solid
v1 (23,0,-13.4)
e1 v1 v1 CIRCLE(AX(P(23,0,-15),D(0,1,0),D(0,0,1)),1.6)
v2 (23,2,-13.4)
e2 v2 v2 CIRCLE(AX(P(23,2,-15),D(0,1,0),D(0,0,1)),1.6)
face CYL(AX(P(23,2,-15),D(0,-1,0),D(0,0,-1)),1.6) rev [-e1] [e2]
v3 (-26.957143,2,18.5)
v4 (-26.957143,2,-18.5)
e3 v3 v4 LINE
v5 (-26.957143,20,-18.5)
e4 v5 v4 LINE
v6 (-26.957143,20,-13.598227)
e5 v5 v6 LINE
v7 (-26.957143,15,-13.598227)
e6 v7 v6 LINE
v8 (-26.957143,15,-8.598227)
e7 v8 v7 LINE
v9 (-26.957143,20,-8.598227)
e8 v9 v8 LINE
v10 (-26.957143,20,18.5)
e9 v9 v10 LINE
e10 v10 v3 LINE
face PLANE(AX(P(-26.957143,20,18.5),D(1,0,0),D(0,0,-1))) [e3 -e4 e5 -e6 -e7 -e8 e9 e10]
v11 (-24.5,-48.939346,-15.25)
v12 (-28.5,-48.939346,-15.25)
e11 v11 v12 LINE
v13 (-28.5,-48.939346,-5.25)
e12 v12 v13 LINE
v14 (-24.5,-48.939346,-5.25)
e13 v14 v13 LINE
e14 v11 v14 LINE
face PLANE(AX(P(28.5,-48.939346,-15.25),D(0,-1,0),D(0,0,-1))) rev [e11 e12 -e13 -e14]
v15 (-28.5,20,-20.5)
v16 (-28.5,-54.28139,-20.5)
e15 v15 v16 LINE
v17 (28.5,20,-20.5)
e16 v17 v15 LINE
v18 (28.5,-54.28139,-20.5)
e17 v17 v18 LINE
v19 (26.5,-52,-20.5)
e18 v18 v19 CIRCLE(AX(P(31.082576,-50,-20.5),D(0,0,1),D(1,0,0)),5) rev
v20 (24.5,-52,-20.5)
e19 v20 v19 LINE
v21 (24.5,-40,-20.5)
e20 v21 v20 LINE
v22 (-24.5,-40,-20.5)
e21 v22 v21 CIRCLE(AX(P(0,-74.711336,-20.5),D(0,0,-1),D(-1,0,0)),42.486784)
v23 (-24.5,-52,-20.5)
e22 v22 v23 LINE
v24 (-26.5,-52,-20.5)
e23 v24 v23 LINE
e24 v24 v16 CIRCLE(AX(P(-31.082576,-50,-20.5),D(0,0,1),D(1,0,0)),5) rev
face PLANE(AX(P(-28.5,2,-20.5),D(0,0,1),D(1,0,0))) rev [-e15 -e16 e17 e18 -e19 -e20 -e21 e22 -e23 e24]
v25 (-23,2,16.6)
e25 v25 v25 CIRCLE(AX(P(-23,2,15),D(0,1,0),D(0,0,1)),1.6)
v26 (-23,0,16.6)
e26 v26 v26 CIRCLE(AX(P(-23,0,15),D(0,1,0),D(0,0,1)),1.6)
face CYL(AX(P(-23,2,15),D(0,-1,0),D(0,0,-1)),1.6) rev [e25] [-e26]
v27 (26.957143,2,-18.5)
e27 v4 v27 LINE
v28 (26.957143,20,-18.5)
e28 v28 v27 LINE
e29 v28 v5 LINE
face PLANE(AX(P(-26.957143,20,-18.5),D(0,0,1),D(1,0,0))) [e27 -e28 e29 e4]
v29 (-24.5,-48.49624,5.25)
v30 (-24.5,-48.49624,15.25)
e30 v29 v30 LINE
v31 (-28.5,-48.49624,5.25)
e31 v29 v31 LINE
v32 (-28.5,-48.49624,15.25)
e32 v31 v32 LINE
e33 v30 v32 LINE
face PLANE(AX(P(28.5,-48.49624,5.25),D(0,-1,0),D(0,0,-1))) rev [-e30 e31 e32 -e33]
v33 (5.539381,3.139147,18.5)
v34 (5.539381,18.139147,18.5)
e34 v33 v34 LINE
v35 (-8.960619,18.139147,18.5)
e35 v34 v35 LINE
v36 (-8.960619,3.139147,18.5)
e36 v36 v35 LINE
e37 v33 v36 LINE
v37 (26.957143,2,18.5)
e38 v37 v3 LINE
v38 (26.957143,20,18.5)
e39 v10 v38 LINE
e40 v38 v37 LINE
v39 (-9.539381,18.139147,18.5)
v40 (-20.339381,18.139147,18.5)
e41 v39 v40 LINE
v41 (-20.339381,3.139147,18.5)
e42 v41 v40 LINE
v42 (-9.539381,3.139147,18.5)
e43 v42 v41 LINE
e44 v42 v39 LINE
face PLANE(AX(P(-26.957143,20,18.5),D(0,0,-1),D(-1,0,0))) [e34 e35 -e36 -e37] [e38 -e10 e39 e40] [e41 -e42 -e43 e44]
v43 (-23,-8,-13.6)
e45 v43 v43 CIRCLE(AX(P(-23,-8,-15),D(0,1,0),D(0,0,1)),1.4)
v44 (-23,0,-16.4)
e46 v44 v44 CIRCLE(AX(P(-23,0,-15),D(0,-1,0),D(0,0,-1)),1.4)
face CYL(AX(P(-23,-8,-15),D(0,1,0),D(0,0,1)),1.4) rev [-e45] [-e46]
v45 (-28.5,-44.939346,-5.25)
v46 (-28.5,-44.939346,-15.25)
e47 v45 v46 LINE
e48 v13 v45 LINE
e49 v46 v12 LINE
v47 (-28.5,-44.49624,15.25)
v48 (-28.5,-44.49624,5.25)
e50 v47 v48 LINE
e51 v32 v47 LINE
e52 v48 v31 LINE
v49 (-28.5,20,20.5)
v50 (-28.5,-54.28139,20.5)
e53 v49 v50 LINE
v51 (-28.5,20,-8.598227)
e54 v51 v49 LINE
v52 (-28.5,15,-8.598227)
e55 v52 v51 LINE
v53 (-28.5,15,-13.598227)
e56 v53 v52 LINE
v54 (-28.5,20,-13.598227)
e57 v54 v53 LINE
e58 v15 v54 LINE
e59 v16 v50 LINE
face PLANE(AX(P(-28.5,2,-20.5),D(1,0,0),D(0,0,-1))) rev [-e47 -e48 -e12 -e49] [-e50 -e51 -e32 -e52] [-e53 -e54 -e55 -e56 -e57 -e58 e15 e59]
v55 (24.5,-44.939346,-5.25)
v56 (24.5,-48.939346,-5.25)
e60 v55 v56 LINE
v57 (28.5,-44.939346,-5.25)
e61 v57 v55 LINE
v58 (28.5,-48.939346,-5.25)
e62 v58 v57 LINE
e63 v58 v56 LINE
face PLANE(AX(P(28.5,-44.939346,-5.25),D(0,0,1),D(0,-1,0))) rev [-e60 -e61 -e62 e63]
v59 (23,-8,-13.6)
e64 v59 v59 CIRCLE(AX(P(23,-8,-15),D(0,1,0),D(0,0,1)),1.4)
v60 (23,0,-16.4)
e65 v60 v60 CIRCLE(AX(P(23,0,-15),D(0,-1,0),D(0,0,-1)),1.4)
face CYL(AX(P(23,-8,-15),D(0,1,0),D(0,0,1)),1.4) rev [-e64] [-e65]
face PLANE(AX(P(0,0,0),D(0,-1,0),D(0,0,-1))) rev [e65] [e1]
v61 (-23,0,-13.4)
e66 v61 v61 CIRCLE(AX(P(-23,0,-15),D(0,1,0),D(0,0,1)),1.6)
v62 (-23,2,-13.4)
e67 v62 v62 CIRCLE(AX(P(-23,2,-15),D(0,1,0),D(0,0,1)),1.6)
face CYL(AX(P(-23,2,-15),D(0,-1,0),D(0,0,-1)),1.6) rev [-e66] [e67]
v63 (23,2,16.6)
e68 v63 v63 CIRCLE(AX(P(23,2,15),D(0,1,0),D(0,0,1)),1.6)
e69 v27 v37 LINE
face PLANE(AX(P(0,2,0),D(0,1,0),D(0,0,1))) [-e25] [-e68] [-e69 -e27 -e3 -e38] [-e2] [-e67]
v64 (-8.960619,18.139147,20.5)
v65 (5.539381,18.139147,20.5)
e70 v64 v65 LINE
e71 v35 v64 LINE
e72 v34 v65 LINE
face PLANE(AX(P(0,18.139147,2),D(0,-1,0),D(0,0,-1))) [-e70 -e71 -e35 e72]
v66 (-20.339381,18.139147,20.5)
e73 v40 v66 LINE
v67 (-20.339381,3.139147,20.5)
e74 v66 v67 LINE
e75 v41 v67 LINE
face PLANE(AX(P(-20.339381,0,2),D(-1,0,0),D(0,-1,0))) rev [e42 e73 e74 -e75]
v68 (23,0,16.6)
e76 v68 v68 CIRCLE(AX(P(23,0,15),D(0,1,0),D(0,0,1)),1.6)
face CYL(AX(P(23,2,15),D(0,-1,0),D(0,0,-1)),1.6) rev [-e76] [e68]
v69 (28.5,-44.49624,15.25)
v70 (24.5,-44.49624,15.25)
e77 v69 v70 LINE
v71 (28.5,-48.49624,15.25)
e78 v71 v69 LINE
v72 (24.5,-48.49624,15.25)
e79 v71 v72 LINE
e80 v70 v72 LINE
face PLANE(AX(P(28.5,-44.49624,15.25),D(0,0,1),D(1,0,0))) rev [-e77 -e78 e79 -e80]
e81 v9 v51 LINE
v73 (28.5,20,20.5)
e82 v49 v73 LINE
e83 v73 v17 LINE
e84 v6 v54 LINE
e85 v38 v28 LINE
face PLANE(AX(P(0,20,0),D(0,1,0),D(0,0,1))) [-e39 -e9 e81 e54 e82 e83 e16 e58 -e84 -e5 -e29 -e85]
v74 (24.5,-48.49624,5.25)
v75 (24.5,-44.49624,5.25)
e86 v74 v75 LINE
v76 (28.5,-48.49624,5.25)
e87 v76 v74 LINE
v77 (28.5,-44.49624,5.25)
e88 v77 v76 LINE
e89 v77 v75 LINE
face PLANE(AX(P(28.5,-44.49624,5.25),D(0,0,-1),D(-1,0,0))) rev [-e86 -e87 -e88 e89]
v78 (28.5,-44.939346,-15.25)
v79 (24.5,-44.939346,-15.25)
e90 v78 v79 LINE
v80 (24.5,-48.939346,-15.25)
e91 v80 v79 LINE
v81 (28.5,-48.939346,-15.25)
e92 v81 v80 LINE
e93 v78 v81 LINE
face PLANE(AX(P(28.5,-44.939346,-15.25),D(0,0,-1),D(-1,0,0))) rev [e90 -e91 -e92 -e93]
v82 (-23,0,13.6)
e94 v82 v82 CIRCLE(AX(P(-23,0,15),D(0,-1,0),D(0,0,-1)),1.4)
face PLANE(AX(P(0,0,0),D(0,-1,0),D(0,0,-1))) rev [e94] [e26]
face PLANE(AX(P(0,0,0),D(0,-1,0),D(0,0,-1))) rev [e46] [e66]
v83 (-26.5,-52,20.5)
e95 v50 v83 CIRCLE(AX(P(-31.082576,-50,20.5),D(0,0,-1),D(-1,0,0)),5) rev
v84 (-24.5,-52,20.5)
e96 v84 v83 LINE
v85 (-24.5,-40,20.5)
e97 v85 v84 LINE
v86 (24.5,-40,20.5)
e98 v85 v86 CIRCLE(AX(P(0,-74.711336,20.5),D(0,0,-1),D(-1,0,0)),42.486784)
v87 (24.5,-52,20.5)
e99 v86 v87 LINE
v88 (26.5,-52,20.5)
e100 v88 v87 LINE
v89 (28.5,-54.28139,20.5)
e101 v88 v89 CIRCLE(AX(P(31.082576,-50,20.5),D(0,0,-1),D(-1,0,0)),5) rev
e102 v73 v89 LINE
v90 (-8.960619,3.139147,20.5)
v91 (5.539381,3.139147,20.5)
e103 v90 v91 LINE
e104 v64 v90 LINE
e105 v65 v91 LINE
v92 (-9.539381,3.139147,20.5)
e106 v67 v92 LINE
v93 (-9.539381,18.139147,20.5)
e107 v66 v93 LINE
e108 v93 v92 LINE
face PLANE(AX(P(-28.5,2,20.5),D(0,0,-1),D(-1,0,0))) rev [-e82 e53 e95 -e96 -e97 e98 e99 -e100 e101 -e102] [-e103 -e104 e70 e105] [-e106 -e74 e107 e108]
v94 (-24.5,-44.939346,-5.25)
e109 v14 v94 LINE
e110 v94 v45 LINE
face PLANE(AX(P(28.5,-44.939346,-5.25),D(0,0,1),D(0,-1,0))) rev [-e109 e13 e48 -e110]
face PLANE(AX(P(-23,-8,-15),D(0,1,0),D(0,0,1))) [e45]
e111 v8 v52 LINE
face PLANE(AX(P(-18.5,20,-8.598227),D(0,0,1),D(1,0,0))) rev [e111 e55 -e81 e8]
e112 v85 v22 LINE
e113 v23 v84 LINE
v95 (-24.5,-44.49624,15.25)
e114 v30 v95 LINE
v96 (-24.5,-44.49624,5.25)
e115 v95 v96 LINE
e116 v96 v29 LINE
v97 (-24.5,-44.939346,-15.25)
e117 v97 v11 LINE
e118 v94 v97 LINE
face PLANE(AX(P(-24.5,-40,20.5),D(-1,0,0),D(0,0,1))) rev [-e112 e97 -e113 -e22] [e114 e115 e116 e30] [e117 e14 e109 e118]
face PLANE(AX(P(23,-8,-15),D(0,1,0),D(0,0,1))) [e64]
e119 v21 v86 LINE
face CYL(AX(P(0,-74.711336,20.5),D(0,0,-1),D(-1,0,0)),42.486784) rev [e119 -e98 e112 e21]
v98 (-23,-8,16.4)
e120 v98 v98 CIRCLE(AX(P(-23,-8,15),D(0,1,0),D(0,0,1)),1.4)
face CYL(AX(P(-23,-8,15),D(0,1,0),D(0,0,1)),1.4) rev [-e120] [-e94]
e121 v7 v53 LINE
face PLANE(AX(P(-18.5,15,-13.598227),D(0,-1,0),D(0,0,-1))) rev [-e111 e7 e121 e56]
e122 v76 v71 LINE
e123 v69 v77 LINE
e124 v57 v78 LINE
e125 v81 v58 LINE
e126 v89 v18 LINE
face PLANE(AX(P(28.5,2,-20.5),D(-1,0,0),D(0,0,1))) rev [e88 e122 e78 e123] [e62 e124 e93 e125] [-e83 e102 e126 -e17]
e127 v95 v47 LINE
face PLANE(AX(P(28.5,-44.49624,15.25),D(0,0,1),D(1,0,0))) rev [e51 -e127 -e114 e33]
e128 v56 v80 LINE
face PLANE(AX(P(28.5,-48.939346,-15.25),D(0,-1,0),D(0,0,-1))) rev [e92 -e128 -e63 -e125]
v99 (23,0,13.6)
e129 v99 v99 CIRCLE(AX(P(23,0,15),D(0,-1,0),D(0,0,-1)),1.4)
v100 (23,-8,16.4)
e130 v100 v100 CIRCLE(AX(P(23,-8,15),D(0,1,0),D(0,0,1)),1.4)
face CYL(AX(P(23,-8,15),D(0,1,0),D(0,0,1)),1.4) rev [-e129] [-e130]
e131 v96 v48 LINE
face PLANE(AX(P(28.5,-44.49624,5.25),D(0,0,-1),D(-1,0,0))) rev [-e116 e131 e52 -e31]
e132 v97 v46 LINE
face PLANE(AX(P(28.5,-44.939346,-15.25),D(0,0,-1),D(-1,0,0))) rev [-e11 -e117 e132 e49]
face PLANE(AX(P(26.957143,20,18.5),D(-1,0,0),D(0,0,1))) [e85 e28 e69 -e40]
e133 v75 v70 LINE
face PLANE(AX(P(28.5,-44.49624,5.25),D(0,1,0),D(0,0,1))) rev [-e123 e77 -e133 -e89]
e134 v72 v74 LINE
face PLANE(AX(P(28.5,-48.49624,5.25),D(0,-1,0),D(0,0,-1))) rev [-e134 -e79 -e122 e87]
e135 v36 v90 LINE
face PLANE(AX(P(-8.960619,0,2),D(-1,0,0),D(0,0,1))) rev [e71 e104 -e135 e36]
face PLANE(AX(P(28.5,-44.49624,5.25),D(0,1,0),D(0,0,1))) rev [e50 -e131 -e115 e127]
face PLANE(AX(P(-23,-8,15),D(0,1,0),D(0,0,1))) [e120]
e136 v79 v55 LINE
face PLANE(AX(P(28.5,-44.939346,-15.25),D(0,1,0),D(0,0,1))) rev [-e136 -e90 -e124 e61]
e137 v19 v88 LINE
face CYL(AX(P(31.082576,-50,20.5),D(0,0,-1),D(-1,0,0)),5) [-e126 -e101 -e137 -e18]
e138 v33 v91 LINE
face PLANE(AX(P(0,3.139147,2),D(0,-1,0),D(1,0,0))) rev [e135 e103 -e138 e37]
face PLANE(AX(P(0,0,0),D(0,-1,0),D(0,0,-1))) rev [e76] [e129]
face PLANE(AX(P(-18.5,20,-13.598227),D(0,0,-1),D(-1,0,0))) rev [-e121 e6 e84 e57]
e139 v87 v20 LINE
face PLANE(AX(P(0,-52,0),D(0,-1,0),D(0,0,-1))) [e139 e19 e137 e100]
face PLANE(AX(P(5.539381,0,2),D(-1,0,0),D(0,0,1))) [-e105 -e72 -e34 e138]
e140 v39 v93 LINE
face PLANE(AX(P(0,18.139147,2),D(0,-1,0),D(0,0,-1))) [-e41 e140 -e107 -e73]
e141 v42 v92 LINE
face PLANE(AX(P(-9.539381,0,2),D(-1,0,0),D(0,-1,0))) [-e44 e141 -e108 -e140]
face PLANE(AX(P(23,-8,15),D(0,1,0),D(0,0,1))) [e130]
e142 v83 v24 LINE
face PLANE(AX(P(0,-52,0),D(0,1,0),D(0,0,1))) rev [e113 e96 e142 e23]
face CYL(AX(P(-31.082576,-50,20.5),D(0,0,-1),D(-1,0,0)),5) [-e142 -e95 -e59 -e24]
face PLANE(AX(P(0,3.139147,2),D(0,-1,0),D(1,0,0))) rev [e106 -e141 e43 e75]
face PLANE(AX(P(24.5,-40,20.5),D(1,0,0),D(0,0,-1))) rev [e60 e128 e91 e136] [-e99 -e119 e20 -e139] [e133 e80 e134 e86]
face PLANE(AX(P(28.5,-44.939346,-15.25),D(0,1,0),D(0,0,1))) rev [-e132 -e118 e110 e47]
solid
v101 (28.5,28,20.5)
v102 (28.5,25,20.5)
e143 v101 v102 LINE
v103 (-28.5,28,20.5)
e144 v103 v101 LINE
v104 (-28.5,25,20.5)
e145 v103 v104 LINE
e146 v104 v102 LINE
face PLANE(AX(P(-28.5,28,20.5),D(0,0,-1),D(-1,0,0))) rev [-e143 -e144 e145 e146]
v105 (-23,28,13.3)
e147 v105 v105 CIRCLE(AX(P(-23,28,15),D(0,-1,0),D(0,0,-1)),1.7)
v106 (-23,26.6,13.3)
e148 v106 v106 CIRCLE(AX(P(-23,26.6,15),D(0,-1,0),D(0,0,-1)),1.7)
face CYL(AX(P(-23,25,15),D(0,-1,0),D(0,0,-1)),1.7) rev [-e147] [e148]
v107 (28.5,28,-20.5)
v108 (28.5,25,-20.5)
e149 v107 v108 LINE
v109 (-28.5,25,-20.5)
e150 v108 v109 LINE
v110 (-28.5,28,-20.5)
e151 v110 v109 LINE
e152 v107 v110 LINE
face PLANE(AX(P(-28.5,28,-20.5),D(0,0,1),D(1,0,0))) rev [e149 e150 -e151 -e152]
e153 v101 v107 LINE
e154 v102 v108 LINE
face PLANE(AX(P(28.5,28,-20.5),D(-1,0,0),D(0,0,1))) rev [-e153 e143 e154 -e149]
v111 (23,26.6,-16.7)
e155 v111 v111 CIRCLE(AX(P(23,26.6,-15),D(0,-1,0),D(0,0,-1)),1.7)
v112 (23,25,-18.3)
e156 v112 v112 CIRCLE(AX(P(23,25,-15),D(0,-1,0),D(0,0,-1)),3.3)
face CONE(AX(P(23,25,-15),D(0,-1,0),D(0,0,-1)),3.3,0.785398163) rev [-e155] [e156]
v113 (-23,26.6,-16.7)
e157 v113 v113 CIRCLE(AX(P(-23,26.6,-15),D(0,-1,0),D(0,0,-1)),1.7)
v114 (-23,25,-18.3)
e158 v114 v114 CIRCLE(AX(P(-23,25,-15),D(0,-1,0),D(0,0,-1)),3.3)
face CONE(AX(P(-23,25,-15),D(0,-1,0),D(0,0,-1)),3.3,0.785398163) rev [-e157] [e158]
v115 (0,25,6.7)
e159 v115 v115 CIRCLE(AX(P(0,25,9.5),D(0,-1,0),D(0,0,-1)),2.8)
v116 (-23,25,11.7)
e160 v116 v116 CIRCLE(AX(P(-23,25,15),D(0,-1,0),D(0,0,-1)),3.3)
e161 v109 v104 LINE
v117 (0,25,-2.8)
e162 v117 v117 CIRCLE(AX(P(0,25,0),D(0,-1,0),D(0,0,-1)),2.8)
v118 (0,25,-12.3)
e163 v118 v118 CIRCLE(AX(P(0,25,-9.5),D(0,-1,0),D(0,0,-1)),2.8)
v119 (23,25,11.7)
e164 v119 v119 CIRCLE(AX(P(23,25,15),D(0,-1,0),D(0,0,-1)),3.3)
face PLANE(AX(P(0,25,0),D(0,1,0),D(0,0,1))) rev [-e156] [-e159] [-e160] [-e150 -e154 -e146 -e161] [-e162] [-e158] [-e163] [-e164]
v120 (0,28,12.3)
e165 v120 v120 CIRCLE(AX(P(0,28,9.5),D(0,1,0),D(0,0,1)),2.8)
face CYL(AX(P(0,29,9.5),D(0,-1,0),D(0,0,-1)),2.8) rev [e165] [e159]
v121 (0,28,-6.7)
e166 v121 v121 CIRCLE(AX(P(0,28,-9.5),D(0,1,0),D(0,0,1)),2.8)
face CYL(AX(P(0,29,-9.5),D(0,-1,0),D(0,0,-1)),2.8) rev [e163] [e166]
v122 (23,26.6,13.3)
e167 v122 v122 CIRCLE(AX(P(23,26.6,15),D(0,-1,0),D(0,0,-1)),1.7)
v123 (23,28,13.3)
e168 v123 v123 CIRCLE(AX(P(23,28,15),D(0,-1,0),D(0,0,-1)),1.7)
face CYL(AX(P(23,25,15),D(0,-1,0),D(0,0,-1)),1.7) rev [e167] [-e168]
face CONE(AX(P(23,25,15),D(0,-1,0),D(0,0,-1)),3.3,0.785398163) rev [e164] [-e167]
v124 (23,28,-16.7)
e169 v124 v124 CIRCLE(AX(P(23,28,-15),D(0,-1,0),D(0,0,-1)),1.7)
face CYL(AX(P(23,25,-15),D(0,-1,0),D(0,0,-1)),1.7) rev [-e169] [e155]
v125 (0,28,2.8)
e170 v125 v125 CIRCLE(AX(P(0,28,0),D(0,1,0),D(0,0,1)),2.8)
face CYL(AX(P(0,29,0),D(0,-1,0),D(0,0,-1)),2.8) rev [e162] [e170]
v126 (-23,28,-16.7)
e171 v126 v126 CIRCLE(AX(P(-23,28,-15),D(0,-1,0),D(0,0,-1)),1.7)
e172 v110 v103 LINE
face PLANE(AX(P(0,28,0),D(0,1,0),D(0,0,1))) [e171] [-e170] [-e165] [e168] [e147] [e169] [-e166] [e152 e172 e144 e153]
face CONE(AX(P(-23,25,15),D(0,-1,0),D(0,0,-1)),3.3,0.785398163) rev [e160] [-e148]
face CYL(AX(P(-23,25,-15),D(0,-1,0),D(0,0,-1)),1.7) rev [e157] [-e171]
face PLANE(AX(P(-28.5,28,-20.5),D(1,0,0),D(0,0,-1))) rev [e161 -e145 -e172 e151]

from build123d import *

# Parameters (mm, degrees)
SKETCH_2_W                  = 57
SKETCH_2_H                  = 41
EXTRUDE_1_DEPTH             = 2
SKETCH_1_R                  = 1.6
CUT_EXTRUDE_1_DEPTH         = 2
SKETCH_4_W                  = 57
SKETCH_4_H                  = 41
SKETCH_4_W_2                = 53.914285714
SKETCH_4_H_2                = 37
EXTRUDE_2_DEPTH             = 20
SKETCH_5_W                  = 10.8
SKETCH_5_H                  = 13
SKETCH_5_H_2                = 2
SKETCH_5_W_2                = 14.5
CUT_EXTRUDE_2_DEPTH         = 18.5
EXTRUDE_START               = 25
SKETCH_6_W                  = 57
SKETCH_6_H                  = 41
EXTRUDE_3_DEPTH             = 3
CUT_EXTRUDE_START           = 23
SKETCH_1_2_R                = 1.6
CUT_EXTRUDE_4_DEPTH         = 5
SKETCH_7_R                  = 2.8
CUT_EXTRUDE_5_DEPTH         = 4
SKETCH_8_W                  = 5
SKETCH_8_H                  = 5
CUT_EXTRUDE_6_DEPTH         = 10
SKETCH_9_W                  = 57
SKETCH_9_H                  = 41
EXTRUDE_4_DEPTH             = 40
SKETCH_10_R                 = 1.4
CUT_EXTRUDE_7_DEPTH         = 10
SKETCH_12_W                 = 8
SKETCH_12_H                 = 41
EXTRUDE_5_DEPTH             = 15
SKETCH_13_W                 = 4
SKETCH_13_H                 = 41
CUT_EXTRUDE_8_DEPTH         = 15
SKETCH_14_W                 = 2
SKETCH_14_H                 = 41
CUT_EXTRUDE_9_DEPTH         = 3
SKETCH_15_W                 = 10
SKETCH_15_H                 = 4
CUT_EXTRUDE_10_DEPTH        = 82.818396464
CUT_EXTRUDE_12_DEPTH        = 75.284924446
HOLE_WIZARD_M3_1_AT_2_COUNT = 2
HOLE_WIZARD_M3_1_AT_2_PITCH = 30
HOLE_WIZARD_M3_1_AT_3_COUNT = 2
HOLE_WIZARD_M3_1_AT_3_PITCH = 54.918120871
HOLE_WIZARD_M3_1_AT_4_COUNT = 2
HOLE_WIZARD_M3_1_AT_4_PITCH = 46
FILLET_1_R                  = 5


with BuildPart() as part:
    # 草图2 → 凸台-拉伸1 (new body)
    with BuildSketch(Plane(origin=(0, 0, 0), x_dir=(1, 0, 0), z_dir=(0, 1, 0))):
        Rectangle(SKETCH_2_W, SKETCH_2_H)
    extrude(amount=EXTRUDE_1_DEPTH)

    # 草图1 → 切除-拉伸1 (cut)
    with BuildSketch(Plane(origin=(0, 0, 0), x_dir=(1, 0, 0), z_dir=(0, 1, 0))):
        with Locations(Location((-23, 15, 0), (0, 0, 270))):
            Circle(SKETCH_1_R)
        with Locations(Location((-23, -15, 0), (0, 0, 270))):
            Circle(SKETCH_1_R)
        with Locations(Location((23, -15, 0), (0, 0, 270))):
            Circle(SKETCH_1_R)
        with Locations(Location((23, 15, 0), (0, 0, 270))):
            Circle(SKETCH_1_R)
    extrude(amount=CUT_EXTRUDE_1_DEPTH, mode=Mode.SUBTRACT)

    # 草图4 → 凸台-拉伸2 (add)
    with BuildSketch(Plane(origin=(0, 0, 0), x_dir=(1, 0, 0), z_dir=(0, 1, 0))):
        Rectangle(SKETCH_4_W, SKETCH_4_H)
        Rectangle(SKETCH_4_W_2, SKETCH_4_H_2, mode=Mode.SUBTRACT)
    extrude(amount=EXTRUDE_2_DEPTH)

    # 草图5 → 切除-拉伸2 (cut)
    with BuildSketch(Plane.XY.offset(20.5)):
        with Locations((-14.939380763, 9.639146882)):
            Rectangle(SKETCH_5_W, SKETCH_5_H)
        with Locations((-14.939380763, 17.139146882)):
            Rectangle(SKETCH_5_W, SKETCH_5_H_2)
        with Locations((-1.710619237, 9.639146882)):
            Rectangle(SKETCH_5_W_2, SKETCH_5_H)
        with Locations((-1.710619237, 17.139146882)):
            Rectangle(SKETCH_5_W_2, SKETCH_5_H_2)
    extrude(amount=-CUT_EXTRUDE_2_DEPTH, mode=Mode.SUBTRACT)

    # 草图8 → 切除-拉伸6 (cut)
    with BuildSketch(Plane.ZY.offset(28.5)):
        with Locations((-11.098227415, 17.5)):
            Rectangle(SKETCH_8_W, SKETCH_8_H)
    extrude(amount=-CUT_EXTRUDE_6_DEPTH, mode=Mode.SUBTRACT)

    # 草图9 → 凸台-拉伸4 (add)
    with BuildSketch(Plane.XZ):
        Rectangle(SKETCH_9_W, SKETCH_9_H)
    extrude(amount=EXTRUDE_4_DEPTH)

    # 草图10 → 切除-拉伸7 (cut)
    with BuildSketch(Plane(origin=(0, 2, 0), x_dir=(1, 0, 0), z_dir=(0, 1, 0))):
        with Locations(Location((-23, 15, 0), (0, 0, 270))):
            Circle(SKETCH_10_R)
        with Locations(Location((-23, -15, 0), (0, 0, 270))):
            Circle(SKETCH_10_R)
        with Locations(Location((23, -15, 0), (0, 0, 270))):
            Circle(SKETCH_10_R)
        with Locations(Location((23, 15, 0), (0, 0, 270))):
            Circle(SKETCH_10_R)
    extrude(amount=-CUT_EXTRUDE_7_DEPTH, mode=Mode.SUBTRACT)

    # 草图12 → 凸台-拉伸5 (add)
    with BuildSketch(Plane.XZ.offset(40)):
        with Locations((-24.5, 0)):
            Rectangle(SKETCH_12_W, SKETCH_12_H)
        with Locations((24.5, 0)):
            Rectangle(SKETCH_12_W, SKETCH_12_H)
    extrude(amount=EXTRUDE_5_DEPTH)

    # 草图13 → 切除-拉伸8 (cut)
    with BuildSketch(Plane.XZ.offset(55)):
        with Locations((-22.5, 0)):
            Rectangle(SKETCH_13_W, SKETCH_13_H)
        with Locations((22.5, 0)):
            Rectangle(SKETCH_13_W, SKETCH_13_H)
    extrude(amount=-CUT_EXTRUDE_8_DEPTH, mode=Mode.SUBTRACT)

    # 草图14 → 切除-拉伸9 (cut)
    with BuildSketch(Plane.XZ.offset(55)):
        with Locations((-25.5, 0)):
            Rectangle(SKETCH_14_W, SKETCH_14_H)
        with Locations((25.5, 0)):
            Rectangle(SKETCH_14_W, SKETCH_14_H)
    extrude(amount=-CUT_EXTRUDE_9_DEPTH, mode=Mode.SUBTRACT)

    # 草图15 → 切除-拉伸10 (cut, through all)
    with BuildSketch(Plane.ZY.offset(28.5)):
        with Locations((-10.25, -46.939346002)):
            Rectangle(SKETCH_15_W, SKETCH_15_H)
        with Locations((10.25, -46.496240266)):
            Rectangle(SKETCH_15_W, SKETCH_15_H)
    extrude(amount=-CUT_EXTRUDE_10_DEPTH, mode=Mode.SUBTRACT)

    # 草图19 → 切除-拉伸12 (cut, through all)
    with BuildSketch(Plane(origin=(0, 0, -20.5), x_dir=(-1, 0, 0), z_dir=(0, 0, -1))):
        with BuildLine():
            ThreePointArc((24.5, -40), (0, -32.224551533), (-24.5, -40))
            Line((-24.5, -40), (24.5, -40))
        make_face()
    extrude(amount=-CUT_EXTRUDE_12_DEPTH, mode=Mode.SUBTRACT)

    # 圆角1
    # the kernel refuses this fillet: 5 mm, written as the material it takes off along each edge
    with BuildSketch(Plane(origin=(26.5, -55, 31.956439237), x_dir=(0, 1, 0), z_dir=(0, 0, -1))) as fillet_1_piece_1:
        with BuildLine():
            CenterArc((5, 4.582575695), FILLET_1_R, 180, 66.421821522)
            Line((0, 4.582575695), (-0.1, 4.582575695))
            Line((-0.1, 4.582575695), (-0.1, 0))
            Line((-0.1, 0), (0, -0.1))
            ThreePointArc((0, -0.1), (1.5, -0.1), (2.96, -0.091651514))
            Line((2.96, -0.091651514), (3, 0))
        make_face()
    extrude(amount=63.912878475, mode=Mode.SUBTRACT)
    with BuildSketch(Plane(origin=(-26.5, -55, 31.956439237), x_dir=(0, 1, 0), z_dir=(0, 0, -1))) as fillet_1_piece_2:
        with BuildLine():
            CenterArc((5, -4.582575695), FILLET_1_R, 113.578178478, 66.421821522)
            Line((0, -4.582575695), (-0.1, -4.582575695))
            Line((-0.1, -4.582575695), (-0.1, 0))
            Line((-0.1, 0), (0, 0.1))
            ThreePointArc((0, 0.1), (1.5, 0.1), (2.96, 0.091651514))
            Line((2.96, 0.091651514), (3, 0))
        make_face()
    extrude(amount=63.912878475, mode=Mode.SUBTRACT)


with BuildPart() as body_2:
    # 草图6 → 凸台-拉伸3 (new body)
    with BuildSketch(Plane(origin=(0, 0, 0), x_dir=(1, 0, 0), z_dir=(0, 1, 0)).offset(EXTRUDE_START)):
        Rectangle(SKETCH_6_W, SKETCH_6_H)
    extrude(amount=EXTRUDE_3_DEPTH)

    # 草图1<2> → 切除-拉伸4 (cut)
    with BuildSketch(Plane(origin=(0, 0, 0), x_dir=(1, 0, 0), z_dir=(0, 1, 0)).offset(CUT_EXTRUDE_START)):
        with Locations(Location((-23, 15, 0), (0, 0, 270))):
            Circle(SKETCH_1_2_R)
        with Locations(Location((-23, -15, 0), (0, 0, 270))):
            Circle(SKETCH_1_2_R)
        with Locations(Location((23, -15, 0), (0, 0, 270))):
            Circle(SKETCH_1_2_R)
        with Locations(Location((23, 15, 0), (0, 0, 270))):
            Circle(SKETCH_1_2_R)
    extrude(amount=CUT_EXTRUDE_4_DEPTH, mode=Mode.SUBTRACT)

    # 草图7 → 切除-拉伸5 (cut)
    with BuildSketch(Plane.XZ.offset(-25)):
        with Locations(Location((0, 0, 0), (0, 0, 270))):
            Circle(SKETCH_7_R)
        with Locations(Location((0, -9.5, 0), (0, 0, 270))):
            Circle(SKETCH_7_R)
        with Locations(Location((0, 9.5, 0), (0, 0, 270))):
            Circle(SKETCH_7_R)
    extrude(amount=-CUT_EXTRUDE_5_DEPTH, mode=Mode.SUBTRACT)

    # 草图21 → M3 十字槽沉头木螺钉的锥形沉头孔1 (revolve, cut)
    with BuildSketch(Plane(origin=(-23, 25, 15), x_dir=(0, 0, -1), z_dir=(1, 0, 0))):
        Polygon((0, 0), (0, 3), (1.7, 3), (1.7, 1.6), (3.3, 0), align=None)
    hole_wizard_m3_1 = revolve(axis=Axis((-23, 18.65, 15), (0, 1, 0)), mode=Mode.SUBTRACT)

    # M3 十字槽沉头木螺钉的锥形沉头孔1 at 2: M3 十字槽沉头木螺钉的锥形沉头孔1 ×2
    with Locations(*[(0, 0, -i * HOLE_WIZARD_M3_1_AT_2_PITCH) for i in range(1, HOLE_WIZARD_M3_1_AT_2_COUNT)]):
        add(hole_wizard_m3_1, mode=Mode.SUBTRACT)

    # M3 十字槽沉头木螺钉的锥形沉头孔1 at 3: M3 十字槽沉头木螺钉的锥形沉头孔1 ×2
    with Locations(*[Vector(0.8376105968386142, 0, -0.5462677805469224) * (i * HOLE_WIZARD_M3_1_AT_3_PITCH) for i in range(1, HOLE_WIZARD_M3_1_AT_3_COUNT)]):
        add(hole_wizard_m3_1, mode=Mode.SUBTRACT)

    # M3 十字槽沉头木螺钉的锥形沉头孔1 at 4: M3 十字槽沉头木螺钉的锥形沉头孔1 ×2
    with Locations(*[(i * HOLE_WIZARD_M3_1_AT_4_PITCH, 0, 0) for i in range(1, HOLE_WIZARD_M3_1_AT_4_COUNT)]):
        add(hole_wizard_m3_1, mode=Mode.SUBTRACT)


solid = Compound([part.part, body_2.part])
